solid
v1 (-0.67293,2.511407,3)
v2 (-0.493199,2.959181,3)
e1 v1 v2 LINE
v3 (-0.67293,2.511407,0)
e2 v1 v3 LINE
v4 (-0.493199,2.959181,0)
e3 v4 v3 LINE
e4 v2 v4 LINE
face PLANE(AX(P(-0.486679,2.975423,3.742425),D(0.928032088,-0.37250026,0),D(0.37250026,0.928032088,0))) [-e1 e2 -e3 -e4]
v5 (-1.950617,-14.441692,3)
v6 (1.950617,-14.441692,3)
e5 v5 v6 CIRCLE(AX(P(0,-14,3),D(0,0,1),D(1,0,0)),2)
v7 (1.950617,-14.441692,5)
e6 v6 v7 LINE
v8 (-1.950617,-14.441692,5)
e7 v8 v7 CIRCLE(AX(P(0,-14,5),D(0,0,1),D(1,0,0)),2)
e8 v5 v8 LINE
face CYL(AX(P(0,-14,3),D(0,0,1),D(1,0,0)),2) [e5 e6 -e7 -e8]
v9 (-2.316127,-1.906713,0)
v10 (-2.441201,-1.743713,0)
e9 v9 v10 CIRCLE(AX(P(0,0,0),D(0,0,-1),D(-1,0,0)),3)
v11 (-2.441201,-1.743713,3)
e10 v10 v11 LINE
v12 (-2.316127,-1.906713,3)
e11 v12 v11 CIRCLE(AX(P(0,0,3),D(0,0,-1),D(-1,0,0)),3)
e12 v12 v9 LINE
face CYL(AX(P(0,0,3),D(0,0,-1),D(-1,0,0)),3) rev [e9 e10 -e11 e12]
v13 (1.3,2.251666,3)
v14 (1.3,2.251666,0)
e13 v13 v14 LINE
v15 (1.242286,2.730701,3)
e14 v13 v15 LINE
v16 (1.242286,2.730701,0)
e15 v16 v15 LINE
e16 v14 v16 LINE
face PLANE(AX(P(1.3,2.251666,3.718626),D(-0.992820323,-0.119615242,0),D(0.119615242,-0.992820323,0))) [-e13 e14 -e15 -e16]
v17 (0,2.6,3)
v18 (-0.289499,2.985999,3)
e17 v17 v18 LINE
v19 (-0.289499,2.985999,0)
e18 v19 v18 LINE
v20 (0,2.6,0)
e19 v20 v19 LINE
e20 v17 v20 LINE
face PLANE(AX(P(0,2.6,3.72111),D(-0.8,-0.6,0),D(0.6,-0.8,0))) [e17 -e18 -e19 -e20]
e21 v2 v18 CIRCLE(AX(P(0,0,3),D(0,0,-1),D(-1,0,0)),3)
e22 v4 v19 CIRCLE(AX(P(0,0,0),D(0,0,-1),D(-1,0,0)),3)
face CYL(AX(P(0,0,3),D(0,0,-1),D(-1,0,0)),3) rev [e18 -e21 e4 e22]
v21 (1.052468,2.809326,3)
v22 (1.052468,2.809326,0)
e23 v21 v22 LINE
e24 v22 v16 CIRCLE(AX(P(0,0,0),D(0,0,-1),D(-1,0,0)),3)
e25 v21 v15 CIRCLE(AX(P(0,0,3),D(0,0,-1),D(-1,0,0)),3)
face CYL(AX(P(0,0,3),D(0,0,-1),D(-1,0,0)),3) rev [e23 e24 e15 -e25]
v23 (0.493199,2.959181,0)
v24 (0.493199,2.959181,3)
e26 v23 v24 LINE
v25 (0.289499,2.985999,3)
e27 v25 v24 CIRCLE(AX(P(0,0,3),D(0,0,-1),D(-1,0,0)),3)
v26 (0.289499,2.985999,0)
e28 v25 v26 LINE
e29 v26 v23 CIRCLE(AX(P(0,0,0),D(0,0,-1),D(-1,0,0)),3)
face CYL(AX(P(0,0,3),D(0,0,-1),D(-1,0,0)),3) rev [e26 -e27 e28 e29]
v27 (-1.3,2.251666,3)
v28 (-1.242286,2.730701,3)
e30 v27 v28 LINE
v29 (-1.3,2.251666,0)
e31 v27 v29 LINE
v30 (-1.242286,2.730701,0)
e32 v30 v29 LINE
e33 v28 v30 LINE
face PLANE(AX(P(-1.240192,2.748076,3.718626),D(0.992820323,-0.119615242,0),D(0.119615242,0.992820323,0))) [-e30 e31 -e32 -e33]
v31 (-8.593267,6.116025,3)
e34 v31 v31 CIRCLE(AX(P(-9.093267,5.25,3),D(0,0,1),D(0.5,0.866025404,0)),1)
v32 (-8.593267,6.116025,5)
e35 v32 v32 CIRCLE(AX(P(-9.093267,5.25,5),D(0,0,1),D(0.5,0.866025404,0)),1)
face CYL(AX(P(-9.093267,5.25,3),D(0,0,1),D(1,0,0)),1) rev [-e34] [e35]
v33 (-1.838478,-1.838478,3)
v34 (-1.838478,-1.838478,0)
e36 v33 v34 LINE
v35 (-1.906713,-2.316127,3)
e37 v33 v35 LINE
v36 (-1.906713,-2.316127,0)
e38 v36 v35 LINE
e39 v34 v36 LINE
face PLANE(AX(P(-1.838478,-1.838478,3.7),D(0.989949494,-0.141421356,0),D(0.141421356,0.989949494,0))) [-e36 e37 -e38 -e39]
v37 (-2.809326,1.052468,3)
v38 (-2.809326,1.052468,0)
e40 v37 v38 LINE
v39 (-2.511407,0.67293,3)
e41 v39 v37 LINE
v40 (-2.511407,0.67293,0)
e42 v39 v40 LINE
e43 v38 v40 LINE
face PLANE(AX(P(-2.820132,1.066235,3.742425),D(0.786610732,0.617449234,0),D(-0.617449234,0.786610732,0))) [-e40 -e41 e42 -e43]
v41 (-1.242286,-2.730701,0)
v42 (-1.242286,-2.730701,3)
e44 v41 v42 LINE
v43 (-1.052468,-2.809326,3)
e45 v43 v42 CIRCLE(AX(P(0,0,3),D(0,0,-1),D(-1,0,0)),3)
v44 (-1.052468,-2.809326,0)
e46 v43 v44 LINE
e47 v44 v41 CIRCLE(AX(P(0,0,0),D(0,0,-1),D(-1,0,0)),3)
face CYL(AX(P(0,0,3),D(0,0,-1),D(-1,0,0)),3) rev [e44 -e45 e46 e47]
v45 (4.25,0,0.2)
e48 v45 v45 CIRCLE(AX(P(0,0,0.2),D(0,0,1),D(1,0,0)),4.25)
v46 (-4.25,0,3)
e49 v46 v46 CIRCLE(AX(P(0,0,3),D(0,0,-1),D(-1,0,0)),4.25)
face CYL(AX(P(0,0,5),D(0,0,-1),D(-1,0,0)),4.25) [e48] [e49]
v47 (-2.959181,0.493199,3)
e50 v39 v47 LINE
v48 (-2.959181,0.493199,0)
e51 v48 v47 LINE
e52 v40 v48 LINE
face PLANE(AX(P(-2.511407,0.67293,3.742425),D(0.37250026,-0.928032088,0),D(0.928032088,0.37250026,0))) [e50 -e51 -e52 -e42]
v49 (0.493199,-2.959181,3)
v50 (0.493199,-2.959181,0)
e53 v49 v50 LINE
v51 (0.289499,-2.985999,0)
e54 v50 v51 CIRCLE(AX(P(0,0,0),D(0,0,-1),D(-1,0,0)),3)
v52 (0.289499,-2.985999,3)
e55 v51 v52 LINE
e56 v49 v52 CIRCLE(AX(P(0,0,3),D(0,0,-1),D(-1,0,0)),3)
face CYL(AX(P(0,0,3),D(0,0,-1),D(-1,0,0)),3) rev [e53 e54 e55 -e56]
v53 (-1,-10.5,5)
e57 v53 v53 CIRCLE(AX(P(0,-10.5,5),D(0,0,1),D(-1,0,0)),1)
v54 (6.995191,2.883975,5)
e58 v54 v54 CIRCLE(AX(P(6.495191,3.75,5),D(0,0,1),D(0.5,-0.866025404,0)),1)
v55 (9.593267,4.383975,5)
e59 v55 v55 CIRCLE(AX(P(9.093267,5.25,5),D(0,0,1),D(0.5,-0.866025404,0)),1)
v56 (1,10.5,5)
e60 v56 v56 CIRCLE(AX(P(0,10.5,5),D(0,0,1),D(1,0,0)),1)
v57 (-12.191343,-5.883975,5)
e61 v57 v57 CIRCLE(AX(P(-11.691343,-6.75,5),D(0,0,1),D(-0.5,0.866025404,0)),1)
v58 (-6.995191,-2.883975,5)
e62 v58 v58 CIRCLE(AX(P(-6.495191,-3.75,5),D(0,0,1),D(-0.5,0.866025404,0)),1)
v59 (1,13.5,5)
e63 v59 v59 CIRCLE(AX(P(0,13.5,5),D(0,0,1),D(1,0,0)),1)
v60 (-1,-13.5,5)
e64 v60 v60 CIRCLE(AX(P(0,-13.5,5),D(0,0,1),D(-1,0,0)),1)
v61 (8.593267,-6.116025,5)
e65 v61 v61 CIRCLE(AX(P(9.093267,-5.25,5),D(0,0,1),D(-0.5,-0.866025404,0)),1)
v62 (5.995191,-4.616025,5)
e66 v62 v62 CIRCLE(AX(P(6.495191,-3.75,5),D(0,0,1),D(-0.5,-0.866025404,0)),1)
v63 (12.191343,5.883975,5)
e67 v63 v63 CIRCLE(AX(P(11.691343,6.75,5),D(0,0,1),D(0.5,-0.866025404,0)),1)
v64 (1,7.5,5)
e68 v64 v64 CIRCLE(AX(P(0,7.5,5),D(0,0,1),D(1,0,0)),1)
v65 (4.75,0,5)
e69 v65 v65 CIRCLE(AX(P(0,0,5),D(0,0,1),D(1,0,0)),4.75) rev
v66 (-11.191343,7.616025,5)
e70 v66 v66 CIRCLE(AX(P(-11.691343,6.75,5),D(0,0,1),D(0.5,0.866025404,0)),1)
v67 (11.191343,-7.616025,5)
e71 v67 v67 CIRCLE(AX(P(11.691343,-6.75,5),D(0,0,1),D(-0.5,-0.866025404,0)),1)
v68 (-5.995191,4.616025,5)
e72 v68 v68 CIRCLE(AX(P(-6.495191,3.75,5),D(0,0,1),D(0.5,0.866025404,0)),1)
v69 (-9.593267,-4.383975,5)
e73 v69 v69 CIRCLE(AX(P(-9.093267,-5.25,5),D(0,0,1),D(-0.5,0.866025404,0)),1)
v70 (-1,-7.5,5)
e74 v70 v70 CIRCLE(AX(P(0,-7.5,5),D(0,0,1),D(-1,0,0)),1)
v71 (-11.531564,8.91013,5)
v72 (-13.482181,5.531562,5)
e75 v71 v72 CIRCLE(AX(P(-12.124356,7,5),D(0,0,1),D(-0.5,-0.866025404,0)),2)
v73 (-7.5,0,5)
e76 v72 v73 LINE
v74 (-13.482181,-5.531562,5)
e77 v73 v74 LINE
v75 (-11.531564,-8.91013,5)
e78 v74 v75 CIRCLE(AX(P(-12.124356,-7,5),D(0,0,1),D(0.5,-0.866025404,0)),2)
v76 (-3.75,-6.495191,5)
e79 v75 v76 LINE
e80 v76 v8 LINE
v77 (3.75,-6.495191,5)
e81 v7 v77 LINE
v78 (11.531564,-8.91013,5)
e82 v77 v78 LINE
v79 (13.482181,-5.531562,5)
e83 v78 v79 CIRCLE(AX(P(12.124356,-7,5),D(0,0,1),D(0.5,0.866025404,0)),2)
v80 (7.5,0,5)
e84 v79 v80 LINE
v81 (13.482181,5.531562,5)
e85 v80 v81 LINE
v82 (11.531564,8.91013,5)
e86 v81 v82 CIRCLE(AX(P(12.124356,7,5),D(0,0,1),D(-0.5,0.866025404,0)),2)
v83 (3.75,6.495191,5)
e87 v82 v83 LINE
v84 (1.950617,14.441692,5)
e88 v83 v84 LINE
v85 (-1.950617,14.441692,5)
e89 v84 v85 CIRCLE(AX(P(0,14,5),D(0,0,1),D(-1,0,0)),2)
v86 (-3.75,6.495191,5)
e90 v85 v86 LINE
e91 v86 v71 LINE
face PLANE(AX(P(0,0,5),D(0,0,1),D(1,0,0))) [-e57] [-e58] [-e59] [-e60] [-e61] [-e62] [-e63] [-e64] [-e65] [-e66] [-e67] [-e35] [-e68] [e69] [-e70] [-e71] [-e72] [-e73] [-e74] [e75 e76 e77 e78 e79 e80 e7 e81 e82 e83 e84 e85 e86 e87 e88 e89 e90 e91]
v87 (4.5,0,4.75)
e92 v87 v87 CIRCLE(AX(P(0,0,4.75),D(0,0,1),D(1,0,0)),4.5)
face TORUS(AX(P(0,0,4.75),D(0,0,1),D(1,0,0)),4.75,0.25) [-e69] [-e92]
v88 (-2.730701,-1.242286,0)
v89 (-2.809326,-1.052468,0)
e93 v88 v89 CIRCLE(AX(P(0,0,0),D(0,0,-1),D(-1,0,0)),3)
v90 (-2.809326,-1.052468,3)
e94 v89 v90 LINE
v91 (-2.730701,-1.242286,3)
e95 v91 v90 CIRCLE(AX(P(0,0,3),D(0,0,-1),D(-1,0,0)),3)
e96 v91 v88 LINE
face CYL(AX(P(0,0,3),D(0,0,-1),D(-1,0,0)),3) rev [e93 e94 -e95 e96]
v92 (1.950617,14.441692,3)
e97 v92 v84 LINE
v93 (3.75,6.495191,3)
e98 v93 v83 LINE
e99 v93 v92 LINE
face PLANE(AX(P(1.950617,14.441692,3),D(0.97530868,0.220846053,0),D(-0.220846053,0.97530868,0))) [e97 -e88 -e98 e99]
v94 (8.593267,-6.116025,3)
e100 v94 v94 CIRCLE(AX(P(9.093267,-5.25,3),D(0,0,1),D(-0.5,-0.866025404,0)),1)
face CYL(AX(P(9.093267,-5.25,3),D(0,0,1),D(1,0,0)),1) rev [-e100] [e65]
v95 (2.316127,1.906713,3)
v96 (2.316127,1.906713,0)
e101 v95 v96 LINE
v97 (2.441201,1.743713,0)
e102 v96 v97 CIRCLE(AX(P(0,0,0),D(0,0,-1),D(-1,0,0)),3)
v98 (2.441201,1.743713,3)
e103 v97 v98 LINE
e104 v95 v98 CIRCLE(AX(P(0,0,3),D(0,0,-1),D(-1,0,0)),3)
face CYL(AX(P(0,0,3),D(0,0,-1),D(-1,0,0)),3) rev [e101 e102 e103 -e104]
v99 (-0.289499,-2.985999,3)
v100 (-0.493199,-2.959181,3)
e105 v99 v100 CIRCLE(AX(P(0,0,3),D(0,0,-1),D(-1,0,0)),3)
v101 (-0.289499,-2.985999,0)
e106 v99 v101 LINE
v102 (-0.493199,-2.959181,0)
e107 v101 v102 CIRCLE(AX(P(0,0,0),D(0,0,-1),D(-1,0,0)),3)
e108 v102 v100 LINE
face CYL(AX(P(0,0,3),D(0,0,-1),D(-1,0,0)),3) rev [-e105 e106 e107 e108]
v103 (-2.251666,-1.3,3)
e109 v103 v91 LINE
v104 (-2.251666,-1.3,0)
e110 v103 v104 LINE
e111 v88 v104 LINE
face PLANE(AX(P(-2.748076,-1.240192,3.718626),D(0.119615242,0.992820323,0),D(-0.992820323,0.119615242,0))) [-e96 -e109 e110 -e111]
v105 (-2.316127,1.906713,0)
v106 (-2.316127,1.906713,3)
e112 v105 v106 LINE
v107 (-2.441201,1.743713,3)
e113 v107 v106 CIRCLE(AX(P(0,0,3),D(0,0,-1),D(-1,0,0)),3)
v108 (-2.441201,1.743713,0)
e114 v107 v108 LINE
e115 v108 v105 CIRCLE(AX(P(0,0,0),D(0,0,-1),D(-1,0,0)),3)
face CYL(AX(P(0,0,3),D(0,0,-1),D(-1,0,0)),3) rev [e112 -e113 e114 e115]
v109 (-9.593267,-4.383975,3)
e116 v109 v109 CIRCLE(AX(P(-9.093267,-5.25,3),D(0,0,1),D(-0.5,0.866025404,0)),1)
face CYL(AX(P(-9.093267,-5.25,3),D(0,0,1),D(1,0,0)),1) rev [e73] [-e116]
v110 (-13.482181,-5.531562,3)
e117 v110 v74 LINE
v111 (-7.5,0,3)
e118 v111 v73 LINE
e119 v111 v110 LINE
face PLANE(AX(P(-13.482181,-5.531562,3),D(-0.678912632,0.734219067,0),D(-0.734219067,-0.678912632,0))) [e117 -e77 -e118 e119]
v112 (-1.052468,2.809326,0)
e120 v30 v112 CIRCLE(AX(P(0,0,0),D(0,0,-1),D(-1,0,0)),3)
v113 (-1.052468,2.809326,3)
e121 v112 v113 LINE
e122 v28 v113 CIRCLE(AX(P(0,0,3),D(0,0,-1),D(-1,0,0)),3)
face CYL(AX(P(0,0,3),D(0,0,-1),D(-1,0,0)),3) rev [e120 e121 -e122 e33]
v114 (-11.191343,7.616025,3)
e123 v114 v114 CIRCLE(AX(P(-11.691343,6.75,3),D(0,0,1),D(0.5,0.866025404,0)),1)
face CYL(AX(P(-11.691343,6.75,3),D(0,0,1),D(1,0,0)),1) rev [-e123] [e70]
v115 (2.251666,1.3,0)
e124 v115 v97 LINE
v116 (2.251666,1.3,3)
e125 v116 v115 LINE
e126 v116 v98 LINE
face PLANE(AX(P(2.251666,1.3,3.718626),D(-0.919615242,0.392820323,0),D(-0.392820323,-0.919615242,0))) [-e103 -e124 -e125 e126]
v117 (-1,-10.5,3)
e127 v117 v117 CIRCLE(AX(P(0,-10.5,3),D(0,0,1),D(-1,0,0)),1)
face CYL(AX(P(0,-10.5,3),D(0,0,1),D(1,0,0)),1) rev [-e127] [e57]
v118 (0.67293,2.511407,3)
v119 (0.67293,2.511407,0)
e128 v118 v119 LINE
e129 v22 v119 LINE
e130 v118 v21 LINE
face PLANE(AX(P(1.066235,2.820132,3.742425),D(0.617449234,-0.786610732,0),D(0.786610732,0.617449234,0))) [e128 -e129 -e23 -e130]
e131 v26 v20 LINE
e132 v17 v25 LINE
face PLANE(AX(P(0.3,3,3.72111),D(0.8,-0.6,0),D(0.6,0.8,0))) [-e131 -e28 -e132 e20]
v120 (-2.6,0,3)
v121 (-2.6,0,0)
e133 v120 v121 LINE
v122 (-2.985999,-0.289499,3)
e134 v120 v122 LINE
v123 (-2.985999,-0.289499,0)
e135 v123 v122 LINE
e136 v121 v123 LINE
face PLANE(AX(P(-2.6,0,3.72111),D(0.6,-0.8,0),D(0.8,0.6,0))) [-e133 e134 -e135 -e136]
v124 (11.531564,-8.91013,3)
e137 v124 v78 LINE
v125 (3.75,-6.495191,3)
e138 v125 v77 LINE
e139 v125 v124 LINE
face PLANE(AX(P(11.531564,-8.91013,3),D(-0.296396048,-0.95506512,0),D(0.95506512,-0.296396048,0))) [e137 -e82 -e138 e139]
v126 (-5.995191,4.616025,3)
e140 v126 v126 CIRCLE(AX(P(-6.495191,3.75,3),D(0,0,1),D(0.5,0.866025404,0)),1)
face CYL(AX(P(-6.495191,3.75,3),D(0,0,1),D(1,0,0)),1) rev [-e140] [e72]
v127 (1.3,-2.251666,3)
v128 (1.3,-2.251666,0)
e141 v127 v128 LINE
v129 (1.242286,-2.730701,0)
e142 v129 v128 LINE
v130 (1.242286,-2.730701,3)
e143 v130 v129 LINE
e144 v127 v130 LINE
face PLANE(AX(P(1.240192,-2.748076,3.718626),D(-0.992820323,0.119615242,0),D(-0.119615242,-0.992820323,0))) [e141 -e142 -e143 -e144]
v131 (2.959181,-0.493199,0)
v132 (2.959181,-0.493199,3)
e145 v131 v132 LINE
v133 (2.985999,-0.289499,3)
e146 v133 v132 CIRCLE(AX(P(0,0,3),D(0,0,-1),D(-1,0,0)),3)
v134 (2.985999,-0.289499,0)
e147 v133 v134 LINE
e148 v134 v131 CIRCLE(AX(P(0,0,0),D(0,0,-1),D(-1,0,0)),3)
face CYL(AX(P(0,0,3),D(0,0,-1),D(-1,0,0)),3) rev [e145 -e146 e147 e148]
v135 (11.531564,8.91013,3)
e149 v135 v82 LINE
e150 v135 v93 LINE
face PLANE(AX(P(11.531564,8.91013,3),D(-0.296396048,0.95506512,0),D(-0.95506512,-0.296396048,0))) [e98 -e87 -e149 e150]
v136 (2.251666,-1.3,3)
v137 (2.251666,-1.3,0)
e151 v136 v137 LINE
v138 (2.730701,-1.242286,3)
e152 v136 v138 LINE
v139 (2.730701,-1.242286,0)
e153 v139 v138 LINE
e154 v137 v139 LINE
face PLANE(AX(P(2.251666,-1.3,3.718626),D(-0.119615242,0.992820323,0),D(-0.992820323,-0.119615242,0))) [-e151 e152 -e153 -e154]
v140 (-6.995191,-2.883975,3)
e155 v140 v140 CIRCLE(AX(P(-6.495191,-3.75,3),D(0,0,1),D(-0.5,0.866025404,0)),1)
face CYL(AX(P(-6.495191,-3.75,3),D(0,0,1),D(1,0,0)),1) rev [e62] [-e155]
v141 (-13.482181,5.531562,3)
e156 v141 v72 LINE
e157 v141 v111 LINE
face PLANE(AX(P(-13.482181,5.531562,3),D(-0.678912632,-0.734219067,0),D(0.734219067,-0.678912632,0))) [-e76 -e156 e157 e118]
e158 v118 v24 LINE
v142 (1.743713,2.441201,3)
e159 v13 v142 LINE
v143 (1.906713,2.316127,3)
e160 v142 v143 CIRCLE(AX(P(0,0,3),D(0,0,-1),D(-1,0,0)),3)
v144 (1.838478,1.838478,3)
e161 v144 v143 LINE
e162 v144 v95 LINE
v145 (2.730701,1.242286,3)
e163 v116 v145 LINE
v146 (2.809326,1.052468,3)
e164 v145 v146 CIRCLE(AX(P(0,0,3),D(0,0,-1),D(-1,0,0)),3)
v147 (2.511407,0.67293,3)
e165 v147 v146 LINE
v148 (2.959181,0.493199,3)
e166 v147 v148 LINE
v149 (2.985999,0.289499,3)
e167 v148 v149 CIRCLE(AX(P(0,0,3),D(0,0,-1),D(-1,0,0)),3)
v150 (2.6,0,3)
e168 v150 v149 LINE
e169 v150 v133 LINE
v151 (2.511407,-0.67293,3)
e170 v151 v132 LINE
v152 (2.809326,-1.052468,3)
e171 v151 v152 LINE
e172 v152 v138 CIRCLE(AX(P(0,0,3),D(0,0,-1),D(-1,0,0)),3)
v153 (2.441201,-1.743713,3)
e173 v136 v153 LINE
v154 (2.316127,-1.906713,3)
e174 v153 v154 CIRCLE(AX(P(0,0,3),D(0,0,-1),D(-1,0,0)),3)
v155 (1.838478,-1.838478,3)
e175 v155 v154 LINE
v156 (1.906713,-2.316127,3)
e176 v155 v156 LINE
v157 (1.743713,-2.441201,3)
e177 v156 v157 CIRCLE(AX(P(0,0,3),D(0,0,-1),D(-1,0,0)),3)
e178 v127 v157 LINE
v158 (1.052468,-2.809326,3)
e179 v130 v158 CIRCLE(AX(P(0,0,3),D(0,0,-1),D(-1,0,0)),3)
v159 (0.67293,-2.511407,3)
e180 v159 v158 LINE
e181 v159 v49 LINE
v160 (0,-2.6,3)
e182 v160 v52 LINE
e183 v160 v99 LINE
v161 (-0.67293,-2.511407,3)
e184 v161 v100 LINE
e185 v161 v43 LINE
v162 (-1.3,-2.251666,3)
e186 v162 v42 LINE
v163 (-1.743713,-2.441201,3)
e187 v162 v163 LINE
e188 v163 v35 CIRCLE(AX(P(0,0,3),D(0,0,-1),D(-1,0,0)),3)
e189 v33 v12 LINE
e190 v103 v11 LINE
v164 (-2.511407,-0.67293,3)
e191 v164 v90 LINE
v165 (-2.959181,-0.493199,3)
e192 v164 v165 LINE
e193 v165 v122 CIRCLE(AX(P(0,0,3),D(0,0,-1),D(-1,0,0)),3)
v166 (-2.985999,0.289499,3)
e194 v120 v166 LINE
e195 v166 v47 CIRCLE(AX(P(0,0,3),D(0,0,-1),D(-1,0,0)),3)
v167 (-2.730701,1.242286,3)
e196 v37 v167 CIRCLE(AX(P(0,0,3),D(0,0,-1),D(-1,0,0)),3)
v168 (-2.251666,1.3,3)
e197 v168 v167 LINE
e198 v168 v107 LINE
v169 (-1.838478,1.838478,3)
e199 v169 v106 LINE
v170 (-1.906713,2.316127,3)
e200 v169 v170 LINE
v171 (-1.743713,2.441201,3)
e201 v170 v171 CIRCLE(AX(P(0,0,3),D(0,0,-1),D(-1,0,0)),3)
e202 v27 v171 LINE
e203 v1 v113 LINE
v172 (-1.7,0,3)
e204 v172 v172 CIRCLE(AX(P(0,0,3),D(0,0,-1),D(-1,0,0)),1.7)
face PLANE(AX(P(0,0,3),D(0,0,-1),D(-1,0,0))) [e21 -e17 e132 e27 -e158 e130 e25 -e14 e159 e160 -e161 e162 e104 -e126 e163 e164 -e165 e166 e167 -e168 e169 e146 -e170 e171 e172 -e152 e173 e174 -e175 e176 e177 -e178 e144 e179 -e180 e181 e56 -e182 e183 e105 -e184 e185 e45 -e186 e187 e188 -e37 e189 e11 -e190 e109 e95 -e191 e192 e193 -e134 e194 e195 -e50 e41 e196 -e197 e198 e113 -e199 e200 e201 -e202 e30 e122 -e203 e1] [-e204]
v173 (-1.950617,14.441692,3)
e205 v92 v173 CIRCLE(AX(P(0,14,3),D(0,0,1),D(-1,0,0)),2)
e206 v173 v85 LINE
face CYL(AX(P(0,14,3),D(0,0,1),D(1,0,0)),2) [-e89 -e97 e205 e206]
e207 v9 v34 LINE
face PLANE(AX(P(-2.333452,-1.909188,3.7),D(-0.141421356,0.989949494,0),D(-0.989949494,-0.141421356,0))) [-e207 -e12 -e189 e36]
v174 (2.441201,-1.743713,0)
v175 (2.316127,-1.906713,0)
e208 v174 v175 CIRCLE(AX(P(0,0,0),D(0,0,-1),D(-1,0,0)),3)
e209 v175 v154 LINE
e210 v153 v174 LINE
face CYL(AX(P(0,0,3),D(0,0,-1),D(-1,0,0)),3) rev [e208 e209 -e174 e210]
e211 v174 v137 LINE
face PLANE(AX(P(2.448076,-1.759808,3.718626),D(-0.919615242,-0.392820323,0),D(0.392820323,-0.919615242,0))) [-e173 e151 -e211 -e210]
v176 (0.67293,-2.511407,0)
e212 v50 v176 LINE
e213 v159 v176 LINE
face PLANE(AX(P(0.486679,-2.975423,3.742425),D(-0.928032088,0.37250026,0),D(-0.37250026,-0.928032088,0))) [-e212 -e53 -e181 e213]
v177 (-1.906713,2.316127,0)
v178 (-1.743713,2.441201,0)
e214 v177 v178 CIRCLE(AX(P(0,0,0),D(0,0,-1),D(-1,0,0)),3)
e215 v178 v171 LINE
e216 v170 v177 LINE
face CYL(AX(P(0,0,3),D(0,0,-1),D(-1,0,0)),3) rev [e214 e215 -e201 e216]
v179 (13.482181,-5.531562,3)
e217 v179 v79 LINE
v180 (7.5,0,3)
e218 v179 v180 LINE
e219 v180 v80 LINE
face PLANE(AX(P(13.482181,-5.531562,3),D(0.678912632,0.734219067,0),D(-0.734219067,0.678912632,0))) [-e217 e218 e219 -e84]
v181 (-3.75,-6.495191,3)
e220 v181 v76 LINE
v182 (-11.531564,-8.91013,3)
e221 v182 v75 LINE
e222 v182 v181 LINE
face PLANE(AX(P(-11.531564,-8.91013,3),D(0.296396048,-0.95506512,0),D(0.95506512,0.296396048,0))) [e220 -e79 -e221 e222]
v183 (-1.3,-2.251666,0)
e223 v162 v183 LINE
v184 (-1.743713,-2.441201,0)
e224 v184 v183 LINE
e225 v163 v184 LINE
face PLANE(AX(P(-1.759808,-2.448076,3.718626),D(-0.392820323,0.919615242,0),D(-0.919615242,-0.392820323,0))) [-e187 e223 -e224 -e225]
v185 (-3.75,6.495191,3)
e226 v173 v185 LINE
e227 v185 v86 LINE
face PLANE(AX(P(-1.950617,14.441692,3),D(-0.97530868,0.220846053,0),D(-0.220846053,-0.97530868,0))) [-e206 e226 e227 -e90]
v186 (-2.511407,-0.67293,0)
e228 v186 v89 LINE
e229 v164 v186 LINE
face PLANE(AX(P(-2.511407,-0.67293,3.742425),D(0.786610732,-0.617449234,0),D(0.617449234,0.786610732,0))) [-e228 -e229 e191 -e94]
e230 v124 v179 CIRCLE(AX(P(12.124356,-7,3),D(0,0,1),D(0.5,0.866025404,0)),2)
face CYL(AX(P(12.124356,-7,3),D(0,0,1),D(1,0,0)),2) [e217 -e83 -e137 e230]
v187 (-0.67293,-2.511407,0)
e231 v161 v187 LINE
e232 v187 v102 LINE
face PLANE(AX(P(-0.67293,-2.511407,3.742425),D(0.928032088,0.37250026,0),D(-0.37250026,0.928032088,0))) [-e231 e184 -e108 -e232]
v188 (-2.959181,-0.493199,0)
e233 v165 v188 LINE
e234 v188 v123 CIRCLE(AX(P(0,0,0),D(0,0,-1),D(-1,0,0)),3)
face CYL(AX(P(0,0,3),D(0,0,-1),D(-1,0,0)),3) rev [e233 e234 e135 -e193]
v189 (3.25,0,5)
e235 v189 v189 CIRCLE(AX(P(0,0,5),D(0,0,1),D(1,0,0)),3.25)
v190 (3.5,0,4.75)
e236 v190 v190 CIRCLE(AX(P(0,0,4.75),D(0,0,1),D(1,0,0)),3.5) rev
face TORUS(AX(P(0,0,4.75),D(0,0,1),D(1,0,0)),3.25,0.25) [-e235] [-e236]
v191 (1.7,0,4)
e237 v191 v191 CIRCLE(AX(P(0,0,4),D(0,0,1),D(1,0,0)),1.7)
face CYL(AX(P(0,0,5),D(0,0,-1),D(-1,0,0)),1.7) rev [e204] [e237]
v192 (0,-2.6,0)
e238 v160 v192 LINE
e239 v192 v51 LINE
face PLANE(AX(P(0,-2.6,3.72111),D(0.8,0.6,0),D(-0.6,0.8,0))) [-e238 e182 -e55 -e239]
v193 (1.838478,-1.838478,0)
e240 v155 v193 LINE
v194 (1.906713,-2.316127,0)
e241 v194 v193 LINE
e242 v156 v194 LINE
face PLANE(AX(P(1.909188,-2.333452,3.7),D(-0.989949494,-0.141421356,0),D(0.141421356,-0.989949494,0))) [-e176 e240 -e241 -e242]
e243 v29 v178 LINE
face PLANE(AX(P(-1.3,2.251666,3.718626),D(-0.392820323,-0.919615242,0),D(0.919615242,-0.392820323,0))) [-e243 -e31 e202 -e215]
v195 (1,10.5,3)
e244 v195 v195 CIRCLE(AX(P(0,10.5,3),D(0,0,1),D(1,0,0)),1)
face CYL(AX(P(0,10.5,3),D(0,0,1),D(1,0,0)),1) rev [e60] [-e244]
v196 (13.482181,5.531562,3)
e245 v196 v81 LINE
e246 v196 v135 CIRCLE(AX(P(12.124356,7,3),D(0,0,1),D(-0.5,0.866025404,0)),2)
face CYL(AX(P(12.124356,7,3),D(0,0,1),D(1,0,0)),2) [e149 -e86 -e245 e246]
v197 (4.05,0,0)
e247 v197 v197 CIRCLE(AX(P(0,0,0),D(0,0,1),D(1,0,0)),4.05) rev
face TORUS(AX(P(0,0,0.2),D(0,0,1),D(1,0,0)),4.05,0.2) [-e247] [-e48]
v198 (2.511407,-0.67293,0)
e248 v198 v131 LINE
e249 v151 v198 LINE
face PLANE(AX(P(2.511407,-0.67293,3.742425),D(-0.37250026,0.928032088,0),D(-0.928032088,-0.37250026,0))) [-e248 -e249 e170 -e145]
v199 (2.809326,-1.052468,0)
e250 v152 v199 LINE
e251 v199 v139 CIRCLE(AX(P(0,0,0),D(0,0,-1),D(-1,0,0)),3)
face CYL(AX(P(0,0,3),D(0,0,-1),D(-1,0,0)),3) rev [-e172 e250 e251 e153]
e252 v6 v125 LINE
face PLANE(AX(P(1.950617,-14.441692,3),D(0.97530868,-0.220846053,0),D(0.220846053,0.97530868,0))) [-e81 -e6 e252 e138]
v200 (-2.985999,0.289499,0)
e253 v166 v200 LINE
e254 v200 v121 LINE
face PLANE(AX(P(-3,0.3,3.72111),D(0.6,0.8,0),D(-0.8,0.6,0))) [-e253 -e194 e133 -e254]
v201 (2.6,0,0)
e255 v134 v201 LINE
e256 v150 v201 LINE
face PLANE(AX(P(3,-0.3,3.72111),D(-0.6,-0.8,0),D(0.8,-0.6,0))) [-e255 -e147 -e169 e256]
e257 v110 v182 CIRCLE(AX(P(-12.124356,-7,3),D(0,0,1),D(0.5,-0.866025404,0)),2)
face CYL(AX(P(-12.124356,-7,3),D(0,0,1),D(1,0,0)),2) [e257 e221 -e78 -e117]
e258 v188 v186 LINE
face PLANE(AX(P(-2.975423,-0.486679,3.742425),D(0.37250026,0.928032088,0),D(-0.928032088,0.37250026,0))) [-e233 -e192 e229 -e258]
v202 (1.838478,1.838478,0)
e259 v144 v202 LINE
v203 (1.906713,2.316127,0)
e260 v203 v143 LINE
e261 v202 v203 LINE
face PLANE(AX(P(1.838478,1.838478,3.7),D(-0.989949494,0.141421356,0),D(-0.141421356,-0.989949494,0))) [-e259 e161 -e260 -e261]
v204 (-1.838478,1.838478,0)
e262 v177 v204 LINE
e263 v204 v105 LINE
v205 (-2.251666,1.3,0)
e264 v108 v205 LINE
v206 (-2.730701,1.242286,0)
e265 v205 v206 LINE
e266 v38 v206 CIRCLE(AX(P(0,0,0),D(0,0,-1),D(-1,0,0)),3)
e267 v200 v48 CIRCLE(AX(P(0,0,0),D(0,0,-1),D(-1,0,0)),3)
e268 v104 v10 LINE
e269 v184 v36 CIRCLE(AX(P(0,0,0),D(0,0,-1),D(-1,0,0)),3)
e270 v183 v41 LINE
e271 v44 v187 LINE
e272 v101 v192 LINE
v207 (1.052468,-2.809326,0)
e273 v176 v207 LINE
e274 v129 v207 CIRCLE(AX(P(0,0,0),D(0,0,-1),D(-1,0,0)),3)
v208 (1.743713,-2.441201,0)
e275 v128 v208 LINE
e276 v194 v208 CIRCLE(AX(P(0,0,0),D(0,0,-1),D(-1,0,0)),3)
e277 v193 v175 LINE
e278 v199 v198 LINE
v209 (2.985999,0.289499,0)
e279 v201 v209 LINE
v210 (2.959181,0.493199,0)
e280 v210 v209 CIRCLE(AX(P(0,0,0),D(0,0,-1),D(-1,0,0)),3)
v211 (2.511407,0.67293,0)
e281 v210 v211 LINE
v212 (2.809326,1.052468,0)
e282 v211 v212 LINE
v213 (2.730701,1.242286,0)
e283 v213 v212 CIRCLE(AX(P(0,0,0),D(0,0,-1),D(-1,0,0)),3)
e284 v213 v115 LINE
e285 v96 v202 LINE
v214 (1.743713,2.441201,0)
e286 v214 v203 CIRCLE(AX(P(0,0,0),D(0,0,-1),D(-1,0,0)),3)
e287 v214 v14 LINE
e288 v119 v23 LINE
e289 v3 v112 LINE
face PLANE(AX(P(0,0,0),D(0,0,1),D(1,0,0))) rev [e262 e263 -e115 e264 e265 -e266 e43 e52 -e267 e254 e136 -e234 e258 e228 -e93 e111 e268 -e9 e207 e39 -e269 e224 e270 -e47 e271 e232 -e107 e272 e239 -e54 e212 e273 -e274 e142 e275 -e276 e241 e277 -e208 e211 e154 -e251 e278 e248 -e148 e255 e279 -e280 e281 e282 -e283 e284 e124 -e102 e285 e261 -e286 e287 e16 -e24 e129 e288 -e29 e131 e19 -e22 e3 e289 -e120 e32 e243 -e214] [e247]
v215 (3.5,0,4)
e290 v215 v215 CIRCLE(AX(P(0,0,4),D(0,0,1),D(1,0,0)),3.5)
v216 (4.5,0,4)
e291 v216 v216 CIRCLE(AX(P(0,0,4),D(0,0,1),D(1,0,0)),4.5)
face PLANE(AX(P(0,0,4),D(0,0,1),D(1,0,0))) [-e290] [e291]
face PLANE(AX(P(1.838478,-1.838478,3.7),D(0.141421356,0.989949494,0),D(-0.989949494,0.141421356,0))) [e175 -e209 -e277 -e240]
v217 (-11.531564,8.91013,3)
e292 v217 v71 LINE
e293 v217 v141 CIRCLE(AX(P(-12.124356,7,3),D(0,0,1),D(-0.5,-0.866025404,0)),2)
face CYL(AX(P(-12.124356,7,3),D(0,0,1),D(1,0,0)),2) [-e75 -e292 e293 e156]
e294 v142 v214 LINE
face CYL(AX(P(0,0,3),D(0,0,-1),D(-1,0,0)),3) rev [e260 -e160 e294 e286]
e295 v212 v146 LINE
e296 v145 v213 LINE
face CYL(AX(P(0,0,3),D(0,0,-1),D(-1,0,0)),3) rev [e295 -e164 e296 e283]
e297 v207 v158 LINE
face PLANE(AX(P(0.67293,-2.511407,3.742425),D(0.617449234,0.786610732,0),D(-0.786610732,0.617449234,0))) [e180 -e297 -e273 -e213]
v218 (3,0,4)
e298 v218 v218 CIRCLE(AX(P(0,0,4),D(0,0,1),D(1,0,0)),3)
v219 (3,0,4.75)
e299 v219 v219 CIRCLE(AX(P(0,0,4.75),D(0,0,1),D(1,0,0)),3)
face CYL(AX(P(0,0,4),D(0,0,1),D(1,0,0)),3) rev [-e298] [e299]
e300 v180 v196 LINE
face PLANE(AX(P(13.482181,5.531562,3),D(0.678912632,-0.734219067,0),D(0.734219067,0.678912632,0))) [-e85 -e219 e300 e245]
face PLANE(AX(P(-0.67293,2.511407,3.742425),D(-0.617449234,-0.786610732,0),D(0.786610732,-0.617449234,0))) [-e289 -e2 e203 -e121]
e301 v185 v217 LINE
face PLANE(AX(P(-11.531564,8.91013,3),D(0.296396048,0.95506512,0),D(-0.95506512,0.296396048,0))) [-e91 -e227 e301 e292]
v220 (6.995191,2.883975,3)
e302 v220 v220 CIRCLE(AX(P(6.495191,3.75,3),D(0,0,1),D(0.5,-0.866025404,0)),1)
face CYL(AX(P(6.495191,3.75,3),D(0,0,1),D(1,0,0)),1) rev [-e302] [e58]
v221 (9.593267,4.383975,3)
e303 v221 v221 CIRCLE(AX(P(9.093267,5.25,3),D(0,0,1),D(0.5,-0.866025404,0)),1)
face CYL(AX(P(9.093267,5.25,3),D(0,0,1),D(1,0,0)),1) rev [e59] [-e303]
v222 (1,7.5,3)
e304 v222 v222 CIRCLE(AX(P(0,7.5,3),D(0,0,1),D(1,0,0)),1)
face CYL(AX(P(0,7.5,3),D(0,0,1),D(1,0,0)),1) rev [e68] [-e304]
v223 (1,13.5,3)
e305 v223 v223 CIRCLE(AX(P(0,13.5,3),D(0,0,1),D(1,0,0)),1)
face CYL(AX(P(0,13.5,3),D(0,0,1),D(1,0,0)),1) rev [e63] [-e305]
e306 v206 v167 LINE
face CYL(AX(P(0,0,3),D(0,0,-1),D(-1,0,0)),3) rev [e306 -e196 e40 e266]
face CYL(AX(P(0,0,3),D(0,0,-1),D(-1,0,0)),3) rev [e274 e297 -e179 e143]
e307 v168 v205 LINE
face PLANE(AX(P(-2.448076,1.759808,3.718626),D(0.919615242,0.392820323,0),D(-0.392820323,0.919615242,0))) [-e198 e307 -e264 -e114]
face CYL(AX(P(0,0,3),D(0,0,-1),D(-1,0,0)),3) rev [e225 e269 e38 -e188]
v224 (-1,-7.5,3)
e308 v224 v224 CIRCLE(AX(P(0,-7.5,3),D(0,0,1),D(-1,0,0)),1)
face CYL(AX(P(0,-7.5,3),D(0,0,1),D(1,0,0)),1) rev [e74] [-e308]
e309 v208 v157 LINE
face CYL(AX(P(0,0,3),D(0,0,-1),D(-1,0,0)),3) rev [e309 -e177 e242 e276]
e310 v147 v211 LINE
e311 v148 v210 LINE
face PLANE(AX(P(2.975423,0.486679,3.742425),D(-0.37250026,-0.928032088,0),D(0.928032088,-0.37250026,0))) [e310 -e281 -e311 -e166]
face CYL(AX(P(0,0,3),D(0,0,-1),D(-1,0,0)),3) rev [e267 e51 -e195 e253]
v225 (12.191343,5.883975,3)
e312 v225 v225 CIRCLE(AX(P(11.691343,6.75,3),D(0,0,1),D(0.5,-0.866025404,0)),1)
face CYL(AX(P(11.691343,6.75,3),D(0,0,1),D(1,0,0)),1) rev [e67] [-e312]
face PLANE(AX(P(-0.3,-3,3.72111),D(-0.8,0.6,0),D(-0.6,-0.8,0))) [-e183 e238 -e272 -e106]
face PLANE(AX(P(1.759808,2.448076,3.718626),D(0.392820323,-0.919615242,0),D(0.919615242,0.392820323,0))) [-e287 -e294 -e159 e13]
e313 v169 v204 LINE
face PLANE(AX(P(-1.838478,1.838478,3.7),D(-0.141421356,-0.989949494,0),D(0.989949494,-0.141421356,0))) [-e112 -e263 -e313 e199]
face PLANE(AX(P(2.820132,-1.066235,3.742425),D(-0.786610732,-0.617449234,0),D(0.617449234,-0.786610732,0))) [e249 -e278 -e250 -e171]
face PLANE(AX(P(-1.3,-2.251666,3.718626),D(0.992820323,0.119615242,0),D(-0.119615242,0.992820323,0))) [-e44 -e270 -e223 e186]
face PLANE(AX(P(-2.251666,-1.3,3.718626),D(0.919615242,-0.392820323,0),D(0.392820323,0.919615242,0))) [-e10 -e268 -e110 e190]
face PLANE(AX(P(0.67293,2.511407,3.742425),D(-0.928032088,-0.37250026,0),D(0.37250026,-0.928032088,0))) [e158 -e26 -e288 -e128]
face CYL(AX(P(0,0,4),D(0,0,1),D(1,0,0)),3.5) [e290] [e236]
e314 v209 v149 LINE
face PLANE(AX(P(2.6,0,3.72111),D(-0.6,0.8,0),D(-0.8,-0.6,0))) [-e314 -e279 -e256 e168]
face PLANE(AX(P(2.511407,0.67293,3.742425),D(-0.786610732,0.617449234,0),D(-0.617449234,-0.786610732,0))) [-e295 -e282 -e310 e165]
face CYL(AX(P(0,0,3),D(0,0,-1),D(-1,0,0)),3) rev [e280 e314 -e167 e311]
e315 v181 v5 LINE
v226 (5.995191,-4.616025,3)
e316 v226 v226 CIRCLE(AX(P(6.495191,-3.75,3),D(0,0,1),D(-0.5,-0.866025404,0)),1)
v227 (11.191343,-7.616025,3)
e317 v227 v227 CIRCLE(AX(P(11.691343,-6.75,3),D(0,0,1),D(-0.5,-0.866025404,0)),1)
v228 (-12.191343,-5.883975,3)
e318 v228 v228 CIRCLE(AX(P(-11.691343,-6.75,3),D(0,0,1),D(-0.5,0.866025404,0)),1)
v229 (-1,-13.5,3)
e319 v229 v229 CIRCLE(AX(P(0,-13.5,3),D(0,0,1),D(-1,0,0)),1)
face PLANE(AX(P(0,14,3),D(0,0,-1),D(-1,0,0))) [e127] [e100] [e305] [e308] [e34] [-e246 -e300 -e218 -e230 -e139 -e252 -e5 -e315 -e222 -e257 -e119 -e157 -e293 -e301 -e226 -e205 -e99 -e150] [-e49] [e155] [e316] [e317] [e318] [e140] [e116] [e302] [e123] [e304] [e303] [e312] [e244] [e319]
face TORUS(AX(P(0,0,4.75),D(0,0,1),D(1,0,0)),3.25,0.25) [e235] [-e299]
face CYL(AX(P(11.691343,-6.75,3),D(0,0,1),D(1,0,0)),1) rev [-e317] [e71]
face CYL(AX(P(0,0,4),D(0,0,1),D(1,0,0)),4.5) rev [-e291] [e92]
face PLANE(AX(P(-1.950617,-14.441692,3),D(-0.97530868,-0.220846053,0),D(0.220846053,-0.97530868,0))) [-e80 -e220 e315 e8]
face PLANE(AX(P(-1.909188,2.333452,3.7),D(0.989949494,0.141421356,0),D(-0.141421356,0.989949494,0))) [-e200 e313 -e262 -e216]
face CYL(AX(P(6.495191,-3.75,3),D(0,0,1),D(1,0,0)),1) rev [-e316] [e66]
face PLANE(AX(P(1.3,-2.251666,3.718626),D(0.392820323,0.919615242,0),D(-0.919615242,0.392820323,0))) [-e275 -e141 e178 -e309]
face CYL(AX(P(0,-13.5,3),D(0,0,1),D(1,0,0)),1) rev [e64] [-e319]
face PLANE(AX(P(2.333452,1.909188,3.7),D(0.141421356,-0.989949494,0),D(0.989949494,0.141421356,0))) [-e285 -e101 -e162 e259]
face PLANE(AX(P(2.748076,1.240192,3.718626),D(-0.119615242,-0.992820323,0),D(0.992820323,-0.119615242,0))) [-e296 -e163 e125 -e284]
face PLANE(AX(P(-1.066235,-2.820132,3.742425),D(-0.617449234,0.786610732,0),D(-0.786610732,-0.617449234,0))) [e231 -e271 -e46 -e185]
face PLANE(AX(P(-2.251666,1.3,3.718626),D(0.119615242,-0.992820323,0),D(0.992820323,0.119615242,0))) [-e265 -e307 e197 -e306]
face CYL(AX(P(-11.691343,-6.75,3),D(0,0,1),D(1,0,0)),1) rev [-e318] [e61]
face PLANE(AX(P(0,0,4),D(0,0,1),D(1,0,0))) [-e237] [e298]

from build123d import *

# Parameters (mm, degrees)
ESQUISSE1_R                  = 4.25
ESQUISSE1_R_2                = 1.7
BOSS_EXTRU_1_DEPTH           = 5
ESQUISSE2_R                  = 3
ENL_V_MAT_EXTRU_1_DEPTH      = 3
BOSS_EXTRU_2_DEPTH           = 3
R_P_TITION_CIRCULAIRE1_DEPTH = 3
ESQUISSE4_R                  = 1
BOSS_EXTRU_3_DEPTH           = 2
R_P_TITION_CIRCULAIRE2_COUNT = 6
ENL_V_START                  = -1
ESQUISSE5_R                  = 3
ENL_V_MAT_EXTRU_2_DEPTH      = 1
CONG_1_R                     = 0.2
ESQUISSE6_R                  = 4.5
ESQUISSE6_R_2                = 3.5
ENL_V_MAT_EXTRU_3_DEPTH      = 1
CONG_2_R                     = 0.25


# Read off the part's stored shape, not the designer's step: Répétition circulaire1
with BuildPart() as part:
    # Esquisse1 → Boss.-Extru.1 (new body)
    with BuildSketch(Plane.XY):
        Circle(ESQUISSE1_R)
        Circle(ESQUISSE1_R_2, mode=Mode.SUBTRACT)
    extrude(amount=BOSS_EXTRU_1_DEPTH)

    # Esquisse2 → Enlèv. mat.-Extru.1 (cut)
    with BuildSketch(Plane(origin=(0, 0, 0), x_dir=(-1, 0, 0), z_dir=(0, 0, -1))):
        Circle(ESQUISSE2_R)
    extrude(amount=-ENL_V_MAT_EXTRU_1_DEPTH, mode=Mode.SUBTRACT)

    # Esquisse3 → Boss.-Extru.2 (add)
    with BuildSketch(Plane(origin=(0, 0, 0), x_dir=(-1, 0, 0), z_dir=(0, 0, -1))):
        Polygon((-0.3, 3), (0, 2.6), (0.3, 3), align=None)
    extrude(amount=-BOSS_EXTRU_2_DEPTH)

    # Répétition circulaire1 outline → Répétition circulaire1 (add)
    with BuildSketch(Plane.XY):
        with BuildLine():
            ThreePointArc((1.052468236, 2.80932565), (0.776457135, 2.897777479), (0.493198596, 2.959181499))
            Line((0.493198596, 2.959181499), (0.672929517, 2.511407148))
            Line((0.672929517, 2.511407148), (1.052468236, 2.80932565))
        make_face()
        with BuildLine():
            ThreePointArc((-0.493198596, 2.959181499), (-0.776457135, 2.897777479), (-1.052468236, 2.80932565))
            Line((-1.052468236, 2.80932565), (-0.672929517, 2.511407148))
            Line((-0.672929517, 2.511407148), (-0.493198596, 2.959181499))
        make_face()
        with BuildLine():
            ThreePointArc((-1.242285791, 2.730700645), (-1.5, 2.598076211), (-1.743713233, 2.441201376))
            Line((-1.743713233, 2.441201376), (-1.3, 2.25166605))
            Line((-1.3, 2.25166605), (-1.242285791, 2.730700645))
        make_face()
        with BuildLine():
            ThreePointArc((-1.906713263, 2.316127054), (-2.121320343, 2.121320343), (-2.316127054, 1.906713263))
            Line((-2.316127054, 1.906713263), (-1.838477631, 1.838477631))
            Line((-1.838477631, 1.838477631), (-1.906713263, 2.316127054))
        make_face()
        with BuildLine():
            ThreePointArc((-2.441201376, 1.743713233), (-2.598076211, 1.5), (-2.730700645, 1.242285791))
            Line((-2.730700645, 1.242285791), (-2.25166605, 1.3))
            Line((-2.25166605, 1.3), (-2.441201376, 1.743713233))
        make_face()
        with BuildLine():
            ThreePointArc((-2.809325651, 1.052468236), (-2.897777479, 0.776457135), (-2.959181499, 0.493198596))
            Line((-2.959181499, 0.493198596), (-2.511407148, 0.672929517))
            Line((-2.511407148, 0.672929517), (-2.809325651, 1.052468236))
        make_face()
        with BuildLine():
            ThreePointArc((-2.985999024, 0.289499268), (-3, 0), (-2.985999024, -0.289499268))
            Line((-2.985999024, -0.289499268), (-2.6, 0))
            Line((-2.6, 0), (-2.985999024, 0.289499268))
        make_face()
        with BuildLine():
            ThreePointArc((-2.959181499, -0.493198596), (-2.897777479, -0.776457135), (-2.809325651, -1.052468236))
            Line((-2.809325651, -1.052468236), (-2.511407148, -0.672929517))
            Line((-2.511407148, -0.672929517), (-2.959181499, -0.493198596))
        make_face()
        with BuildLine():
            ThreePointArc((-2.730700645, -1.242285791), (-2.598076211, -1.5), (-2.441201377, -1.743713233))
            Line((-2.441201377, -1.743713233), (-2.25166605, -1.3))
            Line((-2.25166605, -1.3), (-2.730700645, -1.242285791))
        make_face()
        with BuildLine():
            ThreePointArc((-2.316127055, -1.906713263), (-2.121320344, -2.121320344), (-1.906713263, -2.316127055))
            Line((-1.906713263, -2.316127055), (-1.838477631, -1.838477631))
            Line((-1.838477631, -1.838477631), (-2.316127055, -1.906713263))
        make_face()
        with BuildLine():
            ThreePointArc((-1.743713233, -2.441201377), (-1.5, -2.598076211), (-1.242285791, -2.730700645))
            Line((-1.242285791, -2.730700645), (-1.3, -2.25166605))
            Line((-1.3, -2.25166605), (-1.743713233, -2.441201377))
        make_face()
        with BuildLine():
            ThreePointArc((-1.052468236, -2.809325651), (-0.776457135, -2.897777479), (-0.493198596, -2.959181499))
            Line((-0.493198596, -2.959181499), (-0.672929517, -2.511407148))
            Line((-0.672929517, -2.511407148), (-1.052468236, -2.809325651))
        make_face()
        with BuildLine():
            ThreePointArc((-0.289499268, -2.985999024), (0, -3), (0.289499268, -2.985999024))
            Line((0.289499268, -2.985999024), (0, -2.6))
            Line((0, -2.6), (-0.289499268, -2.985999024))
        make_face()
        with BuildLine():
            ThreePointArc((0.493198596, -2.959181499), (0.776457135, -2.897777479), (1.052468236, -2.809325651))
            Line((1.052468236, -2.809325651), (0.672929517, -2.511407148))
            Line((0.672929517, -2.511407148), (0.493198596, -2.959181499))
        make_face()
        with BuildLine():
            ThreePointArc((1.242285791, -2.730700645), (1.5, -2.598076211), (1.743713233, -2.441201377))
            Line((1.743713233, -2.441201377), (1.3, -2.25166605))
            Line((1.3, -2.25166605), (1.242285791, -2.730700645))
        make_face()
        with BuildLine():
            ThreePointArc((1.906713263, -2.316127055), (2.121320344, -2.121320344), (2.316127055, -1.906713263))
            Line((2.316127055, -1.906713263), (1.838477631, -1.838477631))
            Line((1.838477631, -1.838477631), (1.906713263, -2.316127055))
        make_face()
        with BuildLine():
            ThreePointArc((2.441201377, -1.743713233), (2.598076211, -1.5), (2.730700645, -1.242285791))
            Line((2.730700645, -1.242285791), (2.25166605, -1.3))
            Line((2.25166605, -1.3), (2.441201377, -1.743713233))
        make_face()
        with BuildLine():
            ThreePointArc((2.809325651, -1.052468236), (2.897777479, -0.776457135), (2.959181499, -0.493198596))
            Line((2.959181499, -0.493198596), (2.511407148, -0.672929517))
            Line((2.511407148, -0.672929517), (2.809325651, -1.052468236))
        make_face()
        with BuildLine():
            ThreePointArc((2.985999024, -0.289499268), (3, 0), (2.985999024, 0.289499268))
            Line((2.985999024, 0.289499268), (2.6, 0))
            Line((2.6, 0), (2.985999024, -0.289499268))
        make_face()
        with BuildLine():
            ThreePointArc((2.959181499, 0.493198596), (2.897777479, 0.776457135), (2.809325651, 1.052468236))
            Line((2.809325651, 1.052468236), (2.511407148, 0.672929517))
            Line((2.511407148, 0.672929517), (2.959181499, 0.493198596))
        make_face()
        with BuildLine():
            ThreePointArc((2.730700645, 1.242285791), (2.598076211, 1.5), (2.441201376, 1.743713233))
            Line((2.441201376, 1.743713233), (2.25166605, 1.3))
            Line((2.25166605, 1.3), (2.730700645, 1.242285791))
        make_face()
        with BuildLine():
            ThreePointArc((2.316127054, 1.906713263), (2.121320343, 2.121320343), (1.906713263, 2.316127054))
            Line((1.906713263, 2.316127054), (1.838477631, 1.838477631))
            Line((1.838477631, 1.838477631), (2.316127054, 1.906713263))
        make_face()
        with BuildLine():
            ThreePointArc((1.743713233, 2.441201376), (1.5, 2.598076211), (1.242285791, 2.730700645))
            Line((1.242285791, 2.730700645), (1.3, 2.25166605))
            Line((1.3, 2.25166605), (1.743713233, 2.441201376))
        make_face()
    extrude(amount=R_P_TITION_CIRCULAIRE1_DEPTH)

    # Esquisse4 → Boss.-Extru.3 (add)
    with BuildSketch(Plane.XY.offset(5)):
        with BuildLine():
            Line((-1.95061736, 14.441692106), (-3.75, 6.495190528))
            Line((-3.75, 6.495190528), (-3.75, 2))
            Line((-3.75, 2), (0, 3.364888378))
            Line((0, 3.364888378), (3.75, 2))
            Line((3.75, 2), (3.75, 6.495190528))
            Line((3.75, 6.495190528), (1.95061736, 14.441692106))
            ThreePointArc((1.95061736, 14.441692106), (0, 16), (-1.95061736, 14.441692106))
        make_face()
        with Locations((0, 7.5)):
            Circle(ESQUISSE4_R, mode=Mode.SUBTRACT)
        with Locations((0, 10.5)):
            Circle(ESQUISSE4_R, mode=Mode.SUBTRACT)
        with Locations((0, 13.5)):
            Circle(ESQUISSE4_R, mode=Mode.SUBTRACT)
    boss_extru_3 = extrude(amount=-BOSS_EXTRU_3_DEPTH)

    # Répétition circulaire2: Boss.-Extru.3 ×6 about axis
    r_p_tition_circulaire2_axis = Axis((0, 0, 0), (0, 0, 1))
    for i in range(1, R_P_TITION_CIRCULAIRE2_COUNT):
        add(boss_extru_3.rotate(r_p_tition_circulaire2_axis, i * 360 / R_P_TITION_CIRCULAIRE2_COUNT))

    # Esquisse5 → Enlèv. mat.-Extru.2 (cut)
    with BuildSketch(Plane.XY.offset(5).offset(ENL_V_START)):
        Circle(ESQUISSE5_R)
    extrude(amount=ENL_V_MAT_EXTRU_2_DEPTH, mode=Mode.SUBTRACT)

    # Congé1
    cong_1_edges = [part.edges().sort_by_distance(p)[0] for p in [
        (-4.25, 0, 0),
    ]]
    fillet(cong_1_edges, radius=CONG_1_R)

    # Esquisse6 → Enlèv. mat.-Extru.3 (cut)
    with BuildSketch(Plane.XY.offset(5)):
        Circle(ESQUISSE6_R)
        Circle(ESQUISSE6_R_2, mode=Mode.SUBTRACT)
    extrude(amount=-ENL_V_MAT_EXTRU_3_DEPTH, mode=Mode.SUBTRACT)

    # Congé2
    cong_2_edges = [part.edges().sort_by_distance(p)[0] for p in [
        (-3, 0, 5),
        (-4.5, 0, 5),
        (-3.5, 0, 5),
    ]]
    fillet(cong_2_edges, radius=CONG_2_R - 0.0001)  # a hair under: the kernel refuses the full size


solid = part.part
